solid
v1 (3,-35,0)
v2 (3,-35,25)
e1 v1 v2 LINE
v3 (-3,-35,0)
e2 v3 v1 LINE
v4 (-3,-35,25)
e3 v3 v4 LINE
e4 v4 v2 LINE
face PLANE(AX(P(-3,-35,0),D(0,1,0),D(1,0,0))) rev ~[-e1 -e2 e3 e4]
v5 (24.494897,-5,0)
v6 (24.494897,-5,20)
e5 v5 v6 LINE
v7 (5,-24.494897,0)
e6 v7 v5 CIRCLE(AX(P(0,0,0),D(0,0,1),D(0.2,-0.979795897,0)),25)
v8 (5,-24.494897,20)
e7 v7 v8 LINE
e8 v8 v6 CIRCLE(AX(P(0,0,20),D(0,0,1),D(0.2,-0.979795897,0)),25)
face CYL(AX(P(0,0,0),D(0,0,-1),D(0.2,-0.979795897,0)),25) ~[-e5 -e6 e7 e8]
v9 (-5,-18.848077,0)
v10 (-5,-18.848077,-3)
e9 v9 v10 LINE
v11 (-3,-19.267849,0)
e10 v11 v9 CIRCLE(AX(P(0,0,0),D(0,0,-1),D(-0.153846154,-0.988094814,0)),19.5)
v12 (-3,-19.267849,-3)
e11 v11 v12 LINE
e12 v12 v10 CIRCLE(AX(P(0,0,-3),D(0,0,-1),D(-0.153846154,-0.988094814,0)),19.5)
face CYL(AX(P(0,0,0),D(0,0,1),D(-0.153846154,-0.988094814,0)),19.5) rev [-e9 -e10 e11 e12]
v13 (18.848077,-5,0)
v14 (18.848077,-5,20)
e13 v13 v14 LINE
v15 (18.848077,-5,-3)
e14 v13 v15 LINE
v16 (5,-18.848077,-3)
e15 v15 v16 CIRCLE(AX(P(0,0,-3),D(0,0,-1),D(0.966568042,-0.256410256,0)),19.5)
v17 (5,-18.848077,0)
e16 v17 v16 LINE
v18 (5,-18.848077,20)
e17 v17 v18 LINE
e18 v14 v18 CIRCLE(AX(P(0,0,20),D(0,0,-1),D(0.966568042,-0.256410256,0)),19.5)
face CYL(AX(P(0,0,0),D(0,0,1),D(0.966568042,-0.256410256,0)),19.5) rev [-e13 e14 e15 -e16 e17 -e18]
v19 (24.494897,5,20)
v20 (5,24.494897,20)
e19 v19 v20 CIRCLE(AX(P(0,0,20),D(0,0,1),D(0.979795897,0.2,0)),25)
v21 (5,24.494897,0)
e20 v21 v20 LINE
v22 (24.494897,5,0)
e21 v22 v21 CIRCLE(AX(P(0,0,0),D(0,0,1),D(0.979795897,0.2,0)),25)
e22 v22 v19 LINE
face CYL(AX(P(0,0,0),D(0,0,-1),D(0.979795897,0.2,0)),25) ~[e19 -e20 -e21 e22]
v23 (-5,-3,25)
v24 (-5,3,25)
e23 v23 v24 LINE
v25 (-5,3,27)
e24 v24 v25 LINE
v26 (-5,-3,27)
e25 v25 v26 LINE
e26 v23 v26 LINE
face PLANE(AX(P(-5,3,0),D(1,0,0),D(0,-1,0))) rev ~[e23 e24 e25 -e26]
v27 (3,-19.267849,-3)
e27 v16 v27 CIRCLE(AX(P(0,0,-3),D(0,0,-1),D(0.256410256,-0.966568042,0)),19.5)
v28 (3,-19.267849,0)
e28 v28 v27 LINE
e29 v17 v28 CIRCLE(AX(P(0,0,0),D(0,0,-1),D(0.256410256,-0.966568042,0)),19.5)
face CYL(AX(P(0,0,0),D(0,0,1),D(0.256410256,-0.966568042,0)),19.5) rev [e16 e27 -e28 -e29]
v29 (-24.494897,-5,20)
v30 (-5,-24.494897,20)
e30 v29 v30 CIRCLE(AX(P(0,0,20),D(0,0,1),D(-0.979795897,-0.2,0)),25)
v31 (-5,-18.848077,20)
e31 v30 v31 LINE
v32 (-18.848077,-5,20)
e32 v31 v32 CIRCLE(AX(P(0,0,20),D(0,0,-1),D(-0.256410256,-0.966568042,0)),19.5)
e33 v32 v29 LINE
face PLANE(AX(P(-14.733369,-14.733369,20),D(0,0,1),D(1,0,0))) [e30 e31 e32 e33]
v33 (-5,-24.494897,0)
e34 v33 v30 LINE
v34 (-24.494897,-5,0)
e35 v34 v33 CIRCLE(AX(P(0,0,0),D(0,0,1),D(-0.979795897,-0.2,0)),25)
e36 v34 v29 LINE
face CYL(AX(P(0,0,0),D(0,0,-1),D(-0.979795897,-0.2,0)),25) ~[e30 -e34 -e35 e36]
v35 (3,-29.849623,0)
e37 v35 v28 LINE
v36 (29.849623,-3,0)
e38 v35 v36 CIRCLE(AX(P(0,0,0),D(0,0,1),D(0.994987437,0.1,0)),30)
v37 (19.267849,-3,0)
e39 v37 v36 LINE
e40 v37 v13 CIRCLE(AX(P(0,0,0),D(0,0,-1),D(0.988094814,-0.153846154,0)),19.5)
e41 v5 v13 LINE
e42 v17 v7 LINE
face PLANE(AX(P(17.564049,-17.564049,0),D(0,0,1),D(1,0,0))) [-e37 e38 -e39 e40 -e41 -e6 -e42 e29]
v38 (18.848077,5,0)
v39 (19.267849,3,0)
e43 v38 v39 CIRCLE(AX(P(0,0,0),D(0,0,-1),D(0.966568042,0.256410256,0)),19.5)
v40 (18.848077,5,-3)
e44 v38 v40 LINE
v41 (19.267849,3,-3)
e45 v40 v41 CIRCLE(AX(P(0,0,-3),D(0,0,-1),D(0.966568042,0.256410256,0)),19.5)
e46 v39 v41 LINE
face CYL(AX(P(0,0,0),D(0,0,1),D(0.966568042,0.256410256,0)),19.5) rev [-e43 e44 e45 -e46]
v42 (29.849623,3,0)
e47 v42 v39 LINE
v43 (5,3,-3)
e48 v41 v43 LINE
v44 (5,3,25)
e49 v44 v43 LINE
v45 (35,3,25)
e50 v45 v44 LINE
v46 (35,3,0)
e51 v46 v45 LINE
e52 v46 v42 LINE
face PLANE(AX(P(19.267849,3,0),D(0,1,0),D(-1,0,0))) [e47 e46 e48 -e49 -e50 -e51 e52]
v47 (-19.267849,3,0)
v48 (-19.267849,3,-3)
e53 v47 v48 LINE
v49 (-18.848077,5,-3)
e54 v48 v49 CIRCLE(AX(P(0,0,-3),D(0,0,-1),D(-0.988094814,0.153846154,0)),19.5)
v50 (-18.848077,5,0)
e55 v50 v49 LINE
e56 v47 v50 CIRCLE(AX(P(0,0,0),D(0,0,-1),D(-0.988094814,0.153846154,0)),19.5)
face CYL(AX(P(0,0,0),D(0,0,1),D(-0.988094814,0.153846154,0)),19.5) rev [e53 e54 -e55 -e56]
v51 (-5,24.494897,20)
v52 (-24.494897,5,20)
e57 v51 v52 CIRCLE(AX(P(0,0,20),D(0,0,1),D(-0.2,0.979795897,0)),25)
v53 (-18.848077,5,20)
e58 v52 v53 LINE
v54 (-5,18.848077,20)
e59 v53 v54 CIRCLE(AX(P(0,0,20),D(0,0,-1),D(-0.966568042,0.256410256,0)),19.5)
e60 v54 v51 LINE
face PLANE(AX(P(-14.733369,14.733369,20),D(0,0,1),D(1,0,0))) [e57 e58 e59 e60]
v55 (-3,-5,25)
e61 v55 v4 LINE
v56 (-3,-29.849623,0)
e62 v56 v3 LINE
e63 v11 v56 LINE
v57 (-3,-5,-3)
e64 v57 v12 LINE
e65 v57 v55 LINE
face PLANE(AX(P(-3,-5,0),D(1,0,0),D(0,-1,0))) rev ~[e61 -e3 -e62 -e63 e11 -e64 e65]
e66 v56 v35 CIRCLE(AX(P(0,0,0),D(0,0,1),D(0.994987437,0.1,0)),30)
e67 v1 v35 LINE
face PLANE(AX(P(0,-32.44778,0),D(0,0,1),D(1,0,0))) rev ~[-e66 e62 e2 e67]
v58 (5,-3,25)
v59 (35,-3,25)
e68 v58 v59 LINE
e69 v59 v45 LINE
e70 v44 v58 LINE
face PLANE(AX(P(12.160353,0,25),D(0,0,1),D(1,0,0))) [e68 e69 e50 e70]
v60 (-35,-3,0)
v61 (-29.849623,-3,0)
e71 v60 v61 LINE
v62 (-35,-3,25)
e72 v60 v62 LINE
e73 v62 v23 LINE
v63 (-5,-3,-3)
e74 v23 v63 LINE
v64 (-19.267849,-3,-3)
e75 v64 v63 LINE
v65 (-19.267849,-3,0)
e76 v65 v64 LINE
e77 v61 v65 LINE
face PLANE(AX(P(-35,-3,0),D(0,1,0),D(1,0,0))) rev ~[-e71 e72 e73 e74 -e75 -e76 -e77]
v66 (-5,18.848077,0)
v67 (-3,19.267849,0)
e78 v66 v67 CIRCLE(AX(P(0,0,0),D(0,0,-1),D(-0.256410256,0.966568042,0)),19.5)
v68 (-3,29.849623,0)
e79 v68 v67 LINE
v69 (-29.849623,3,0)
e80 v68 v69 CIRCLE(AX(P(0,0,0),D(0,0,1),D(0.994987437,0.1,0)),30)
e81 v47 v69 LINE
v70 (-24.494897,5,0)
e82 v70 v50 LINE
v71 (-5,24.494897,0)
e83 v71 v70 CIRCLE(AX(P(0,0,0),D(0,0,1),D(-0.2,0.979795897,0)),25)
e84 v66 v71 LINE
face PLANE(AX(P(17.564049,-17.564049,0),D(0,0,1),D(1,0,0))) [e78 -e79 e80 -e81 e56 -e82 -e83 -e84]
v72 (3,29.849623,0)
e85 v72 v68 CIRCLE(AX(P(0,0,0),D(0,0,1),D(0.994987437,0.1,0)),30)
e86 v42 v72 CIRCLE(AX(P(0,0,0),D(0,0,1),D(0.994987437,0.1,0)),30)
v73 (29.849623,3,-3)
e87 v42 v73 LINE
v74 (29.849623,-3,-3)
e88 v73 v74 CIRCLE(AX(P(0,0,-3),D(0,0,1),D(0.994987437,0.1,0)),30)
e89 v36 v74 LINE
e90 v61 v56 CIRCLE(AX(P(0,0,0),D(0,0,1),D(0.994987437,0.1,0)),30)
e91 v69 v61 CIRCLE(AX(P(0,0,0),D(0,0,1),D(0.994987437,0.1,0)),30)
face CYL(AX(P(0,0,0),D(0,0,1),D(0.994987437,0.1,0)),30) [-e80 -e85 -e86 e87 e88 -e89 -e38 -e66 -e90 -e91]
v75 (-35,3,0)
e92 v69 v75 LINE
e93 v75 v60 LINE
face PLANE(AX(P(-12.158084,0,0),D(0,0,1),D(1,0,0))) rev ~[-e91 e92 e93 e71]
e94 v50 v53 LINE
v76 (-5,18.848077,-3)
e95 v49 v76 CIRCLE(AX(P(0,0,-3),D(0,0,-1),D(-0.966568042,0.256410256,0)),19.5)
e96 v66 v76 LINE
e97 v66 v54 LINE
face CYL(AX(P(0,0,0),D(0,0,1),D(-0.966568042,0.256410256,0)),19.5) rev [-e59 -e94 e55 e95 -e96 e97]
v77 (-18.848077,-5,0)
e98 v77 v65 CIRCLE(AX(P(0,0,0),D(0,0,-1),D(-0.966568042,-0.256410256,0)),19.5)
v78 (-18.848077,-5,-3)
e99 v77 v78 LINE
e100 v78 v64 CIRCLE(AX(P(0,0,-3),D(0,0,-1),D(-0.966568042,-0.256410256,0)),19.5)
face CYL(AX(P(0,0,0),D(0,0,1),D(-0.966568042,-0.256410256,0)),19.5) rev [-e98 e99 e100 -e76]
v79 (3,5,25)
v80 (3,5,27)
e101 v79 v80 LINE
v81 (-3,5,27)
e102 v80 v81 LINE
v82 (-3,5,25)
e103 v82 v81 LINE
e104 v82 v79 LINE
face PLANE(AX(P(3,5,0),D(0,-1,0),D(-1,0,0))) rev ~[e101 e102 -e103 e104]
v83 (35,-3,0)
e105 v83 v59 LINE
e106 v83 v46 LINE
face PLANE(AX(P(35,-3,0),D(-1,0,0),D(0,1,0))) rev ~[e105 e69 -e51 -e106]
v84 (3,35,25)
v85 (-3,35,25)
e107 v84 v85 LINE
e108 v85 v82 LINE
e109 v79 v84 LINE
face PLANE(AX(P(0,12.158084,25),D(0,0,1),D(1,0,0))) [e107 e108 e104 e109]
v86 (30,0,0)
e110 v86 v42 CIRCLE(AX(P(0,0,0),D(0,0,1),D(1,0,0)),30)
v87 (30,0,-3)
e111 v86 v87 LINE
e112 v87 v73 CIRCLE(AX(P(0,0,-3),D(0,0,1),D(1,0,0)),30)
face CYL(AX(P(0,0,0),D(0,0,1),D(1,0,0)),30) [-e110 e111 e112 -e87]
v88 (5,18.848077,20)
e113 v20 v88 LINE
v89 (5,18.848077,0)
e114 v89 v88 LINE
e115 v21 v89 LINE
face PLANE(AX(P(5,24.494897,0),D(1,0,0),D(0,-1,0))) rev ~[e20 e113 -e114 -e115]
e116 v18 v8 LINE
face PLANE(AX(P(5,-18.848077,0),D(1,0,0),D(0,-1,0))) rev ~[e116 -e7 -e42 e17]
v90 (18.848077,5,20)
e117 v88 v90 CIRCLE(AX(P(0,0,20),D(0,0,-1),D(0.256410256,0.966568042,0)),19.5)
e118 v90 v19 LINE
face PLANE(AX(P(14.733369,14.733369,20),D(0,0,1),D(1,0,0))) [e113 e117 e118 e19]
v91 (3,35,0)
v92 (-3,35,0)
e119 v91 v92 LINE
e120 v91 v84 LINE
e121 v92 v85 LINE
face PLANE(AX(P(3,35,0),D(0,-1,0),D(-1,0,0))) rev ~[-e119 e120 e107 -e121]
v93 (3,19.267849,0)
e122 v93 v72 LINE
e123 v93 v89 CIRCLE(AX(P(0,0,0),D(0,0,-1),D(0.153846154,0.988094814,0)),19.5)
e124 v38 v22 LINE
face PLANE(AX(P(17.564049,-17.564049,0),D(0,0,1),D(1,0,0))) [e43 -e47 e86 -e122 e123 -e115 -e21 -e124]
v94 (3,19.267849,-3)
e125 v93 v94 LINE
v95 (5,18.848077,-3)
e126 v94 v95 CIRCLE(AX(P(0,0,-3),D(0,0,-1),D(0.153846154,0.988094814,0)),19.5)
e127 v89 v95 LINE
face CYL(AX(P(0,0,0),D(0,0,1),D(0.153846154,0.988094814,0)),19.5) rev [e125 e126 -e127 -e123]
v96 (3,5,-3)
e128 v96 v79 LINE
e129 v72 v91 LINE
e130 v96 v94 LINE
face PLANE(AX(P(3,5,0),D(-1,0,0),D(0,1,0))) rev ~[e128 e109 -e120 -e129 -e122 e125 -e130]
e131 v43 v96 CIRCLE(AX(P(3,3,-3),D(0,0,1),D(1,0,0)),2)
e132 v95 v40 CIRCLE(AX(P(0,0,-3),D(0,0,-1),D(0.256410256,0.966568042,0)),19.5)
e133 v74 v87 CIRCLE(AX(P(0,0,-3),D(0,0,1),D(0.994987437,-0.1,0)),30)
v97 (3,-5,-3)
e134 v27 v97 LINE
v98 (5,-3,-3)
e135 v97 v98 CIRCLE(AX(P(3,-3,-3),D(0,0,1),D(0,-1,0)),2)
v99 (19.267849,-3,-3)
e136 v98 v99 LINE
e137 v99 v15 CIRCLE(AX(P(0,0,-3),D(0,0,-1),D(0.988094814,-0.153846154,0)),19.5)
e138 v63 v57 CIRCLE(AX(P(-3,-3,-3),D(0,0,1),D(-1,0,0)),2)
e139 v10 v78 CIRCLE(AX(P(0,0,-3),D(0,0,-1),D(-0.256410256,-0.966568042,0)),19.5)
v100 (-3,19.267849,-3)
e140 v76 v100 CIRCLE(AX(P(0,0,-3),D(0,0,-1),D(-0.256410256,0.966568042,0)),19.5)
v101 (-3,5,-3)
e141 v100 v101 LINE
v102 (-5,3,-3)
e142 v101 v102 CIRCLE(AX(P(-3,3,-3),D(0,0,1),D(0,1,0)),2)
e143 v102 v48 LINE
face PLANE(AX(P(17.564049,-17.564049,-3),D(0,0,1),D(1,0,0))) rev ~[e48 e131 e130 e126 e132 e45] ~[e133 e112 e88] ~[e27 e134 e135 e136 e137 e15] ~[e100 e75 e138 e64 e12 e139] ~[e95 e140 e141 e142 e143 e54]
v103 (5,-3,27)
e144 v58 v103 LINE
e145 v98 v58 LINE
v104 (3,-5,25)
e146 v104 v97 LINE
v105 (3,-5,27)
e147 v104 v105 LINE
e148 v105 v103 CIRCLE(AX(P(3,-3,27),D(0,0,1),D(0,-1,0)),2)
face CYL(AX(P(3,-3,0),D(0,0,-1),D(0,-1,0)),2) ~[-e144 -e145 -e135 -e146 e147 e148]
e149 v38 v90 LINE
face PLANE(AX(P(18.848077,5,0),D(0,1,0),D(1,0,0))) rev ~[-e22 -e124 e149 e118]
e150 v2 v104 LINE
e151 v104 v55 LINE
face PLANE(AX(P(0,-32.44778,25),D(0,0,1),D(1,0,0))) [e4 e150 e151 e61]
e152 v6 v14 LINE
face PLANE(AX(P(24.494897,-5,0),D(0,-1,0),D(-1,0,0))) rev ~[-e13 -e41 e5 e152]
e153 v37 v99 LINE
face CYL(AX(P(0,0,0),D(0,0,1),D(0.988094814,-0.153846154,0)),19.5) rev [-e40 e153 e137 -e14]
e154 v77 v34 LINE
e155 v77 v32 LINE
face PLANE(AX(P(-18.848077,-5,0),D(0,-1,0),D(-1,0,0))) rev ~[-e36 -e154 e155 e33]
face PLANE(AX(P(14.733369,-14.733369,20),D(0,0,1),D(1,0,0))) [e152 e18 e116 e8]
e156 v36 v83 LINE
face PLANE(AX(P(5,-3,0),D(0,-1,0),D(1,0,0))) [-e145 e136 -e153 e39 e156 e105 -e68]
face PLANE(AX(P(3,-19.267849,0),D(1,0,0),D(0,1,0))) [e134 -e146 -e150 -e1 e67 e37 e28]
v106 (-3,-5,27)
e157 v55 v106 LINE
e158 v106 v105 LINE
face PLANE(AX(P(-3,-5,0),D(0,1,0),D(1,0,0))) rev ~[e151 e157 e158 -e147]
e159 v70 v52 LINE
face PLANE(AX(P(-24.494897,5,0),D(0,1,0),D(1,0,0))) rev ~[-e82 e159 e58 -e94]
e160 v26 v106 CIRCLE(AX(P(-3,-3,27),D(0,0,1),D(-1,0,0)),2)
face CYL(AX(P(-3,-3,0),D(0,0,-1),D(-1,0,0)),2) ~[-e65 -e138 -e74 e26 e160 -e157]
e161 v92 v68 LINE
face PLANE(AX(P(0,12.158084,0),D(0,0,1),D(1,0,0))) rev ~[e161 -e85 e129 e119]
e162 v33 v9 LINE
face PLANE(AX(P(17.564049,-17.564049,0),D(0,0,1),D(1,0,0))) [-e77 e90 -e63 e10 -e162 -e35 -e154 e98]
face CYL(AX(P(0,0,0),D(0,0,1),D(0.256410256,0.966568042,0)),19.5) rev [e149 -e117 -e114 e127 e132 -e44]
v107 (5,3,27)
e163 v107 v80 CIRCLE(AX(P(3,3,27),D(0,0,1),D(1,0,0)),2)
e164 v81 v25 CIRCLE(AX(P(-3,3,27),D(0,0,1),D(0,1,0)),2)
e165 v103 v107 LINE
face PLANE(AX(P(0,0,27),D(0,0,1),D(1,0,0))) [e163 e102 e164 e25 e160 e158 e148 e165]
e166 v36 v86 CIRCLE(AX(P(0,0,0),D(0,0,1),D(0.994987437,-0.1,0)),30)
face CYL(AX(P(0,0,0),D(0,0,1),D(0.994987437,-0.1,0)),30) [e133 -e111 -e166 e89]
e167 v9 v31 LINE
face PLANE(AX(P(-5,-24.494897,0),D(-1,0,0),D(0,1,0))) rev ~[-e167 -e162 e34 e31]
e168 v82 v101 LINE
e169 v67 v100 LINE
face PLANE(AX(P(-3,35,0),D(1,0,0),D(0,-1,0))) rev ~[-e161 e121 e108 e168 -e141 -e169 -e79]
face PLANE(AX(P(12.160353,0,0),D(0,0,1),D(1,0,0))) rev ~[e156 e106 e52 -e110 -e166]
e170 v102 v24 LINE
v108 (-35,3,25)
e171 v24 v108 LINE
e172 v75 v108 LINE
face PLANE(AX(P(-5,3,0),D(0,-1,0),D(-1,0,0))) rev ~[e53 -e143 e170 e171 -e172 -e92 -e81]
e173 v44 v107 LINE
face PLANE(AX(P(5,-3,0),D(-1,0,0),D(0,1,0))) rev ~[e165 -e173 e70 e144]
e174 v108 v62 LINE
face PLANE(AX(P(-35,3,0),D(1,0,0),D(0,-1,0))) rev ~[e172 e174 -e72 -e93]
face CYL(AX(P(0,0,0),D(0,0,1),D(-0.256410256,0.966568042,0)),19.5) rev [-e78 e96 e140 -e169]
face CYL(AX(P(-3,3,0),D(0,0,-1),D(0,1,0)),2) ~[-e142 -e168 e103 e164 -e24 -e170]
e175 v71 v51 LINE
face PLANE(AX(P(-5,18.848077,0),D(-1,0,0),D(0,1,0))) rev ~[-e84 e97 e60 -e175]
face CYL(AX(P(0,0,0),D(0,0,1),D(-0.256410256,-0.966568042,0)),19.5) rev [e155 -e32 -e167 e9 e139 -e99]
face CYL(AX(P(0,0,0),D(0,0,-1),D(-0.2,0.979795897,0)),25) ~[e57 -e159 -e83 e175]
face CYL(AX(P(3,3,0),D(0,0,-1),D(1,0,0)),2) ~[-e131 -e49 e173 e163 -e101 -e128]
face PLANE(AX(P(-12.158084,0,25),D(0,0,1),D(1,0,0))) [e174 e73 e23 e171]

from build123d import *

# Parameters (mm, degrees)
F1_DEPTH = 3
F2_DEPTH = 20
F3_DEPTH = 25
F4_DEPTH = 27


with BuildPart() as f1:
    # F0 (on Top) → F1 (new body)
    with BuildSketch(Plane.XY):
        with BuildLine():
            Line((29.8496231132, -3), (24.819347292, -3))
            ThreePointArc((24.819347292, -3), (24.6773921449, -4.0032882645), (24.4948974278, -5))
            ThreePointArc((24.4948974278, -5), (17.6776695297, -17.6776695297), (5, -24.4948974278))
            ThreePointArc((5, -24.4948974278), (4.0032882645, -24.6773921449), (3, -24.819347292))
            Line((3, -24.819347292), (3, -29.8496231132))
            ThreePointArc((3, -29.8496231132), (21.2132034356, -21.2132034356), (29.8496231132, -3))
        make_face()
        with BuildLine():
            ThreePointArc((5, -24.4948974278), (17.6776695297, -17.6776695297), (24.4948974278, -5))
            Line((24.4948974278, -5), (18.848076825, -5))
            ThreePointArc((18.848076825, -5), (13.7885822331, -13.7885822331), (5, -18.848076825))
            Line((5, -18.848076825), (5, -24.4948974278))
        make_face()
        with BuildLine():
            ThreePointArc((24.4948974278, -5), (24.6773921449, -4.0032882645), (24.819347292, -3))
            Line((24.819347292, -3), (19.267848868, -3))
            ThreePointArc((19.267848868, -3), (19.0841805655, -4.0055027327), (18.848076825, -5))
            Line((18.848076825, -5), (24.4948974278, -5))
        make_face()
        with BuildLine():
            ThreePointArc((25, 0), (24.9547959549, 1.5027171558), (24.819347292, 3))
            Line((24.819347292, 3), (19.267848868, 3))
            ThreePointArc((19.267848868, 3), (19.4418755902, 1.5044844755), (19.5, 0))
            ThreePointArc((19.5, 0), (19.4418755902, -1.5044844755), (19.267848868, -3))
            Line((19.267848868, -3), (24.819347292, -3))
            ThreePointArc((24.819347292, -3), (24.9547959549, -1.5027171558), (25, 0))
        make_face()
        with BuildLine():
            ThreePointArc((24.819347292, 3), (24.6773921449, 4.0032882645), (24.4948974278, 5))
            Line((24.4948974278, 5), (18.848076825, 5))
            ThreePointArc((18.848076825, 5), (19.0841805655, 4.0055027327), (19.267848868, 3))
            Line((19.267848868, 3), (24.819347292, 3))
        make_face()
        with BuildLine():
            Line((18.848076825, 5), (24.4948974278, 5))
            ThreePointArc((24.4948974278, 5), (17.6776695297, 17.6776695297), (5, 24.4948974278))
            Line((5, 24.4948974278), (5, 18.848076825))
            ThreePointArc((5, 18.848076825), (13.7885822331, 13.7885822331), (18.848076825, 5))
        make_face()
        with BuildLine():
            ThreePointArc((5, 24.4948974278), (17.6776695297, 17.6776695297), (24.4948974278, 5))
            ThreePointArc((24.4948974278, 5), (24.6773921449, 4.0032882645), (24.819347292, 3))
            Line((24.819347292, 3), (29.8496231132, 3))
            ThreePointArc((29.8496231132, 3), (21.2132034356, 21.2132034356), (3, 29.8496231132))
            Line((3, 29.8496231132), (3, 24.819347292))
            ThreePointArc((3, 24.819347292), (4.0032882645, 24.6773921449), (5, 24.4948974278))
        make_face()
        with BuildLine():
            Line((29.8496231132, 3), (24.819347292, 3))
            ThreePointArc((24.819347292, 3), (24.9547959549, 1.5027171558), (25, 0))
            ThreePointArc((25, 0), (24.9547959549, -1.5027171558), (24.819347292, -3))
            Line((24.819347292, -3), (29.8496231132, -3))
            ThreePointArc((29.8496231132, -3), (29.9623821933, -1.5018832518), (30, 0))
            ThreePointArc((30, 0), (29.9623821933, 1.5018832518), (29.8496231132, 3))
        make_face()
        with BuildLine():
            ThreePointArc((-3, -29.8496231132), (0, -30), (3, -29.8496231132))
            Line((3, -29.8496231132), (3, -24.819347292))
            ThreePointArc((3, -24.819347292), (0, -25), (-3, -24.819347292))
            Line((-3, -24.819347292), (-3, -29.8496231132))
        make_face()
        with BuildLine():
            ThreePointArc((-3, -24.819347292), (0, -25), (3, -24.819347292))
            Line((3, -24.819347292), (3, -19.267848868))
            ThreePointArc((3, -19.267848868), (0, -19.5), (-3, -19.267848868))
            Line((-3, -19.267848868), (-3, -24.819347292))
        make_face()
        with BuildLine():
            ThreePointArc((3, -24.819347292), (4.0032882645, -24.6773921449), (5, -24.4948974278))
            Line((5, -24.4948974278), (5, -18.848076825))
            ThreePointArc((5, -18.848076825), (4.0055027327, -19.0841805655), (3, -19.267848868))
            Line((3, -19.267848868), (3, -24.819347292))
        make_face()
        with BuildLine():
            ThreePointArc((-5, -24.4948974278), (-4.0032882645, -24.6773921449), (-3, -24.819347292))
            Line((-3, -24.819347292), (-3, -19.267848868))
            ThreePointArc((-3, -19.267848868), (-4.0055027327, -19.0841805655), (-5, -18.848076825))
            Line((-5, -18.848076825), (-5, -24.4948974278))
        make_face()
        with BuildLine():
            Line((-24.819347292, -3), (-29.8496231132, -3))
            ThreePointArc((-29.8496231132, -3), (-21.2132034356, -21.2132034356), (-3, -29.8496231132))
            Line((-3, -29.8496231132), (-3, -24.819347292))
            ThreePointArc((-3, -24.819347292), (-4.0032882645, -24.6773921449), (-5, -24.4948974278))
            ThreePointArc((-5, -24.4948974278), (-17.6776695297, -17.6776695297), (-24.4948974278, -5))
            ThreePointArc((-24.4948974278, -5), (-24.6773921449, -4.0032882645), (-24.819347292, -3))
        make_face()
        with BuildLine():
            Line((-18.848076825, -5), (-24.4948974278, -5))
            ThreePointArc((-24.4948974278, -5), (-17.6776695297, -17.6776695297), (-5, -24.4948974278))
            Line((-5, -24.4948974278), (-5, -18.848076825))
            ThreePointArc((-5, -18.848076825), (-13.7885822331, -13.7885822331), (-18.848076825, -5))
        make_face()
        with BuildLine():
            Line((-19.267848868, -3), (-24.819347292, -3))
            ThreePointArc((-24.819347292, -3), (-24.6773921449, -4.0032882645), (-24.4948974278, -5))
            Line((-24.4948974278, -5), (-18.848076825, -5))
            ThreePointArc((-18.848076825, -5), (-19.0841805655, -4.0055027327), (-19.267848868, -3))
        make_face()
        with BuildLine():
            Line((-19.267848868, 3), (-24.819347292, 3))
            ThreePointArc((-24.819347292, 3), (-25, 0), (-24.819347292, -3))
            Line((-24.819347292, -3), (-19.267848868, -3))
            ThreePointArc((-19.267848868, -3), (-19.5, 0), (-19.267848868, 3))
        make_face()
        with BuildLine():
            Line((-18.848076825, 5), (-24.4948974278, 5))
            ThreePointArc((-24.4948974278, 5), (-24.6773921449, 4.0032882645), (-24.819347292, 3))
            Line((-24.819347292, 3), (-19.267848868, 3))
            ThreePointArc((-19.267848868, 3), (-19.0841805655, 4.0055027327), (-18.848076825, 5))
        make_face()
        with BuildLine():
            ThreePointArc((-5, 24.4948974278), (-4.0032882645, 24.6773921449), (-3, 24.819347292))
            Line((-3, 24.819347292), (-3, 29.8496231132))
            ThreePointArc((-3, 29.8496231132), (-21.2132034356, 21.2132034356), (-29.8496231132, 3))
            Line((-29.8496231132, 3), (-24.819347292, 3))
            ThreePointArc((-24.819347292, 3), (-24.6773921449, 4.0032882645), (-24.4948974278, 5))
            ThreePointArc((-24.4948974278, 5), (-17.6776695297, 17.6776695297), (-5, 24.4948974278))
        make_face()
        with BuildLine():
            Line((-5, 18.848076825), (-5, 24.4948974278))
            ThreePointArc((-5, 24.4948974278), (-17.6776695297, 17.6776695297), (-24.4948974278, 5))
            Line((-24.4948974278, 5), (-18.848076825, 5))
            ThreePointArc((-18.848076825, 5), (-13.7885822331, 13.7885822331), (-5, 18.848076825))
        make_face()
        with BuildLine():
            Line((-3, 19.267848868), (-3, 24.819347292))
            ThreePointArc((-3, 24.819347292), (-4.0032882645, 24.6773921449), (-5, 24.4948974278))
            Line((-5, 24.4948974278), (-5, 18.848076825))
            ThreePointArc((-5, 18.848076825), (-4.0055027327, 19.0841805655), (-3, 19.267848868))
        make_face()
        with BuildLine():
            Line((3, 19.267848868), (3, 24.819347292))
            ThreePointArc((3, 24.819347292), (0, 25), (-3, 24.819347292))
            Line((-3, 24.819347292), (-3, 19.267848868))
            ThreePointArc((-3, 19.267848868), (0, 19.5), (3, 19.267848868))
        make_face()
        with BuildLine():
            Line((5, 18.848076825), (5, 24.4948974278))
            ThreePointArc((5, 24.4948974278), (4.0032882645, 24.6773921449), (3, 24.819347292))
            Line((3, 24.819347292), (3, 19.267848868))
            ThreePointArc((3, 19.267848868), (4.0055027327, 19.0841805655), (5, 18.848076825))
        make_face()
        with BuildLine():
            ThreePointArc((-3, 24.819347292), (0, 25), (3, 24.819347292))
            Line((3, 24.819347292), (3, 29.8496231132))
            ThreePointArc((3, 29.8496231132), (0, 30), (-3, 29.8496231132))
            Line((-3, 29.8496231132), (-3, 24.819347292))
        make_face()
        with BuildLine():
            Line((-24.819347292, 3), (-29.8496231132, 3))
            ThreePointArc((-29.8496231132, 3), (-30, 0), (-29.8496231132, -3))
            Line((-29.8496231132, -3), (-24.819347292, -3))
            ThreePointArc((-24.819347292, -3), (-25, 0), (-24.819347292, 3))
        make_face()
        with BuildLine():
            Line((3, -19.267848868), (3, -5))
            Line((3, -5), (-3, -5))
            Line((-3, -5), (-3, -19.267848868))
            ThreePointArc((-3, -19.267848868), (0, -19.5), (3, -19.267848868))
        make_face()
        with BuildLine():
            ThreePointArc((19.5, 0), (19.4418755902, 1.5044844755), (19.267848868, 3))
            Line((19.267848868, 3), (5, 3))
            Line((5, 3), (5, -3))
            Line((5, -3), (19.267848868, -3))
            ThreePointArc((19.267848868, -3), (19.4418755902, -1.5044844755), (19.5, 0))
        make_face()
        with BuildLine():
            Line((3, 5), (3, 19.267848868))
            ThreePointArc((3, 19.267848868), (0, 19.5), (-3, 19.267848868))
            Line((-3, 19.267848868), (-3, 5))
            Line((-3, 5), (3, 5))
        make_face()
        with BuildLine():
            Line((-5, -3), (-5, 3))
            Line((-5, 3), (-19.267848868, 3))
            ThreePointArc((-19.267848868, 3), (-19.5, 0), (-19.267848868, -3))
            Line((-19.267848868, -3), (-5, -3))
        make_face()
        with BuildLine():
            Line((5, -3), (5, 3))
            ThreePointArc((5, 3), (4.4142135624, 4.4142135624), (3, 5))
            Line((3, 5), (-3, 5))
            ThreePointArc((-3, 5), (-4.4142135624, 4.4142135624), (-5, 3))
            Line((-5, 3), (-5, -3))
            ThreePointArc((-5, -3), (-4.4142135624, -4.4142135624), (-3, -5))
            Line((-3, -5), (3, -5))
            ThreePointArc((3, -5), (4.4142135624, -4.4142135624), (5, -3))
        make_face()
    extrude(amount=-F1_DEPTH)

    # F0 (on Top) → F2 (join)
    with BuildSketch(Plane.XY):
        with BuildLine():
            Line((-5, 18.848076825), (-5, 24.4948974278))
            ThreePointArc((-5, 24.4948974278), (-17.6776695297, 17.6776695297), (-24.4948974278, 5))
            Line((-24.4948974278, 5), (-18.848076825, 5))
            ThreePointArc((-18.848076825, 5), (-13.7885822331, 13.7885822331), (-5, 18.848076825))
        make_face()
        with BuildLine():
            Line((18.848076825, 5), (24.4948974278, 5))
            ThreePointArc((24.4948974278, 5), (17.6776695297, 17.6776695297), (5, 24.4948974278))
            Line((5, 24.4948974278), (5, 18.848076825))
            ThreePointArc((5, 18.848076825), (13.7885822331, 13.7885822331), (18.848076825, 5))
        make_face()
        with BuildLine():
            ThreePointArc((5, -24.4948974278), (17.6776695297, -17.6776695297), (24.4948974278, -5))
            Line((24.4948974278, -5), (18.848076825, -5))
            ThreePointArc((18.848076825, -5), (13.7885822331, -13.7885822331), (5, -18.848076825))
            Line((5, -18.848076825), (5, -24.4948974278))
        make_face()
        with BuildLine():
            Line((-18.848076825, -5), (-24.4948974278, -5))
            ThreePointArc((-24.4948974278, -5), (-17.6776695297, -17.6776695297), (-5, -24.4948974278))
            Line((-5, -24.4948974278), (-5, -18.848076825))
            ThreePointArc((-5, -18.848076825), (-13.7885822331, -13.7885822331), (-18.848076825, -5))
        make_face()
    extrude(amount=F2_DEPTH)

    # F0 (on Top) → F3 (join)
    with BuildSketch(Plane.XY):
        with BuildLine():
            Line((-5, -3), (-5, 3))
            Line((-5, 3), (-19.267848868, 3))
            ThreePointArc((-19.267848868, 3), (-19.5, 0), (-19.267848868, -3))
            Line((-19.267848868, -3), (-5, -3))
        make_face()
        with BuildLine():
            Line((-19.267848868, 3), (-24.819347292, 3))
            ThreePointArc((-24.819347292, 3), (-25, 0), (-24.819347292, -3))
            Line((-24.819347292, -3), (-19.267848868, -3))
            ThreePointArc((-19.267848868, -3), (-19.5, 0), (-19.267848868, 3))
        make_face()
        with BuildLine():
            Line((-24.819347292, 3), (-29.8496231132, 3))
            ThreePointArc((-29.8496231132, 3), (-30, 0), (-29.8496231132, -3))
            Line((-29.8496231132, -3), (-24.819347292, -3))
            ThreePointArc((-24.819347292, -3), (-25, 0), (-24.819347292, 3))
        make_face()
        with BuildLine():
            ThreePointArc((-29.8496231132, -3), (-30, 0), (-29.8496231132, 3))
            Line((-29.8496231132, 3), (-35, 3))
            Line((-35, 3), (-35, -3))
            Line((-35, -3), (-29.8496231132, -3))
        make_face()
        with BuildLine():
            Line((3, -35), (3, -29.8496231132))
            ThreePointArc((3, -29.8496231132), (0, -30), (-3, -29.8496231132))
            Line((-3, -29.8496231132), (-3, -35))
            Line((-3, -35), (3, -35))
        make_face()
        with BuildLine():
            ThreePointArc((-3, -29.8496231132), (0, -30), (3, -29.8496231132))
            Line((3, -29.8496231132), (3, -24.819347292))
            ThreePointArc((3, -24.819347292), (0, -25), (-3, -24.819347292))
            Line((-3, -24.819347292), (-3, -29.8496231132))
        make_face()
        with BuildLine():
            ThreePointArc((-3, -24.819347292), (0, -25), (3, -24.819347292))
            Line((3, -24.819347292), (3, -19.267848868))
            ThreePointArc((3, -19.267848868), (0, -19.5), (-3, -19.267848868))
            Line((-3, -19.267848868), (-3, -24.819347292))
        make_face()
        with BuildLine():
            Line((3, -19.267848868), (3, -5))
            Line((3, -5), (-3, -5))
            Line((-3, -5), (-3, -19.267848868))
            ThreePointArc((-3, -19.267848868), (0, -19.5), (3, -19.267848868))
        make_face()
        with BuildLine():
            ThreePointArc((19.5, 0), (19.4418755902, 1.5044844755), (19.267848868, 3))
            Line((19.267848868, 3), (5, 3))
            Line((5, 3), (5, -3))
            Line((5, -3), (19.267848868, -3))
            ThreePointArc((19.267848868, -3), (19.4418755902, -1.5044844755), (19.5, 0))
        make_face()
        with BuildLine():
            ThreePointArc((25, 0), (24.9547959549, 1.5027171558), (24.819347292, 3))
            Line((24.819347292, 3), (19.267848868, 3))
            ThreePointArc((19.267848868, 3), (19.4418755902, 1.5044844755), (19.5, 0))
            ThreePointArc((19.5, 0), (19.4418755902, -1.5044844755), (19.267848868, -3))
            Line((19.267848868, -3), (24.819347292, -3))
            ThreePointArc((24.819347292, -3), (24.9547959549, -1.5027171558), (25, 0))
        make_face()
        with BuildLine():
            Line((29.8496231132, 3), (24.819347292, 3))
            ThreePointArc((24.819347292, 3), (24.9547959549, 1.5027171558), (25, 0))
            ThreePointArc((25, 0), (24.9547959549, -1.5027171558), (24.819347292, -3))
            Line((24.819347292, -3), (29.8496231132, -3))
            ThreePointArc((29.8496231132, -3), (29.9623821933, -1.5018832518), (30, 0))
            ThreePointArc((30, 0), (29.9623821933, 1.5018832518), (29.8496231132, 3))
        make_face()
        with BuildLine():
            Line((35, 3), (29.8496231132, 3))
            ThreePointArc((29.8496231132, 3), (29.9623821933, 1.5018832518), (30, 0))
            ThreePointArc((30, 0), (29.9623821933, -1.5018832518), (29.8496231132, -3))
            Line((29.8496231132, -3), (35, -3))
            Line((35, -3), (35, 3))
        make_face()
        with BuildLine():
            Line((3, 5), (3, 19.267848868))
            ThreePointArc((3, 19.267848868), (0, 19.5), (-3, 19.267848868))
            Line((-3, 19.267848868), (-3, 5))
            Line((-3, 5), (3, 5))
        make_face()
        with BuildLine():
            Line((3, 19.267848868), (3, 24.819347292))
            ThreePointArc((3, 24.819347292), (0, 25), (-3, 24.819347292))
            Line((-3, 24.819347292), (-3, 19.267848868))
            ThreePointArc((-3, 19.267848868), (0, 19.5), (3, 19.267848868))
        make_face()
        with BuildLine():
            ThreePointArc((-3, 24.819347292), (0, 25), (3, 24.819347292))
            Line((3, 24.819347292), (3, 29.8496231132))
            ThreePointArc((3, 29.8496231132), (0, 30), (-3, 29.8496231132))
            Line((-3, 29.8496231132), (-3, 24.819347292))
        make_face()
        with BuildLine():
            ThreePointArc((-3, 29.8496231132), (0, 30), (3, 29.8496231132))
            Line((3, 29.8496231132), (3, 35))
            Line((3, 35), (-3, 35))
            Line((-3, 35), (-3, 29.8496231132))
        make_face()
    extrude(amount=F3_DEPTH)

    # F0 (on Top) → F4 (join)
    with BuildSketch(Plane.XY):
        with BuildLine():
            Line((5, -3), (5, 3))
            ThreePointArc((5, 3), (4.4142135624, 4.4142135624), (3, 5))
            Line((3, 5), (-3, 5))
            ThreePointArc((-3, 5), (-4.4142135624, 4.4142135624), (-5, 3))
            Line((-5, 3), (-5, -3))
            ThreePointArc((-5, -3), (-4.4142135624, -4.4142135624), (-3, -5))
            Line((-3, -5), (3, -5))
            ThreePointArc((3, -5), (4.4142135624, -4.4142135624), (5, -3))
        make_face()
    extrude(amount=F4_DEPTH)


solid = f1.part
